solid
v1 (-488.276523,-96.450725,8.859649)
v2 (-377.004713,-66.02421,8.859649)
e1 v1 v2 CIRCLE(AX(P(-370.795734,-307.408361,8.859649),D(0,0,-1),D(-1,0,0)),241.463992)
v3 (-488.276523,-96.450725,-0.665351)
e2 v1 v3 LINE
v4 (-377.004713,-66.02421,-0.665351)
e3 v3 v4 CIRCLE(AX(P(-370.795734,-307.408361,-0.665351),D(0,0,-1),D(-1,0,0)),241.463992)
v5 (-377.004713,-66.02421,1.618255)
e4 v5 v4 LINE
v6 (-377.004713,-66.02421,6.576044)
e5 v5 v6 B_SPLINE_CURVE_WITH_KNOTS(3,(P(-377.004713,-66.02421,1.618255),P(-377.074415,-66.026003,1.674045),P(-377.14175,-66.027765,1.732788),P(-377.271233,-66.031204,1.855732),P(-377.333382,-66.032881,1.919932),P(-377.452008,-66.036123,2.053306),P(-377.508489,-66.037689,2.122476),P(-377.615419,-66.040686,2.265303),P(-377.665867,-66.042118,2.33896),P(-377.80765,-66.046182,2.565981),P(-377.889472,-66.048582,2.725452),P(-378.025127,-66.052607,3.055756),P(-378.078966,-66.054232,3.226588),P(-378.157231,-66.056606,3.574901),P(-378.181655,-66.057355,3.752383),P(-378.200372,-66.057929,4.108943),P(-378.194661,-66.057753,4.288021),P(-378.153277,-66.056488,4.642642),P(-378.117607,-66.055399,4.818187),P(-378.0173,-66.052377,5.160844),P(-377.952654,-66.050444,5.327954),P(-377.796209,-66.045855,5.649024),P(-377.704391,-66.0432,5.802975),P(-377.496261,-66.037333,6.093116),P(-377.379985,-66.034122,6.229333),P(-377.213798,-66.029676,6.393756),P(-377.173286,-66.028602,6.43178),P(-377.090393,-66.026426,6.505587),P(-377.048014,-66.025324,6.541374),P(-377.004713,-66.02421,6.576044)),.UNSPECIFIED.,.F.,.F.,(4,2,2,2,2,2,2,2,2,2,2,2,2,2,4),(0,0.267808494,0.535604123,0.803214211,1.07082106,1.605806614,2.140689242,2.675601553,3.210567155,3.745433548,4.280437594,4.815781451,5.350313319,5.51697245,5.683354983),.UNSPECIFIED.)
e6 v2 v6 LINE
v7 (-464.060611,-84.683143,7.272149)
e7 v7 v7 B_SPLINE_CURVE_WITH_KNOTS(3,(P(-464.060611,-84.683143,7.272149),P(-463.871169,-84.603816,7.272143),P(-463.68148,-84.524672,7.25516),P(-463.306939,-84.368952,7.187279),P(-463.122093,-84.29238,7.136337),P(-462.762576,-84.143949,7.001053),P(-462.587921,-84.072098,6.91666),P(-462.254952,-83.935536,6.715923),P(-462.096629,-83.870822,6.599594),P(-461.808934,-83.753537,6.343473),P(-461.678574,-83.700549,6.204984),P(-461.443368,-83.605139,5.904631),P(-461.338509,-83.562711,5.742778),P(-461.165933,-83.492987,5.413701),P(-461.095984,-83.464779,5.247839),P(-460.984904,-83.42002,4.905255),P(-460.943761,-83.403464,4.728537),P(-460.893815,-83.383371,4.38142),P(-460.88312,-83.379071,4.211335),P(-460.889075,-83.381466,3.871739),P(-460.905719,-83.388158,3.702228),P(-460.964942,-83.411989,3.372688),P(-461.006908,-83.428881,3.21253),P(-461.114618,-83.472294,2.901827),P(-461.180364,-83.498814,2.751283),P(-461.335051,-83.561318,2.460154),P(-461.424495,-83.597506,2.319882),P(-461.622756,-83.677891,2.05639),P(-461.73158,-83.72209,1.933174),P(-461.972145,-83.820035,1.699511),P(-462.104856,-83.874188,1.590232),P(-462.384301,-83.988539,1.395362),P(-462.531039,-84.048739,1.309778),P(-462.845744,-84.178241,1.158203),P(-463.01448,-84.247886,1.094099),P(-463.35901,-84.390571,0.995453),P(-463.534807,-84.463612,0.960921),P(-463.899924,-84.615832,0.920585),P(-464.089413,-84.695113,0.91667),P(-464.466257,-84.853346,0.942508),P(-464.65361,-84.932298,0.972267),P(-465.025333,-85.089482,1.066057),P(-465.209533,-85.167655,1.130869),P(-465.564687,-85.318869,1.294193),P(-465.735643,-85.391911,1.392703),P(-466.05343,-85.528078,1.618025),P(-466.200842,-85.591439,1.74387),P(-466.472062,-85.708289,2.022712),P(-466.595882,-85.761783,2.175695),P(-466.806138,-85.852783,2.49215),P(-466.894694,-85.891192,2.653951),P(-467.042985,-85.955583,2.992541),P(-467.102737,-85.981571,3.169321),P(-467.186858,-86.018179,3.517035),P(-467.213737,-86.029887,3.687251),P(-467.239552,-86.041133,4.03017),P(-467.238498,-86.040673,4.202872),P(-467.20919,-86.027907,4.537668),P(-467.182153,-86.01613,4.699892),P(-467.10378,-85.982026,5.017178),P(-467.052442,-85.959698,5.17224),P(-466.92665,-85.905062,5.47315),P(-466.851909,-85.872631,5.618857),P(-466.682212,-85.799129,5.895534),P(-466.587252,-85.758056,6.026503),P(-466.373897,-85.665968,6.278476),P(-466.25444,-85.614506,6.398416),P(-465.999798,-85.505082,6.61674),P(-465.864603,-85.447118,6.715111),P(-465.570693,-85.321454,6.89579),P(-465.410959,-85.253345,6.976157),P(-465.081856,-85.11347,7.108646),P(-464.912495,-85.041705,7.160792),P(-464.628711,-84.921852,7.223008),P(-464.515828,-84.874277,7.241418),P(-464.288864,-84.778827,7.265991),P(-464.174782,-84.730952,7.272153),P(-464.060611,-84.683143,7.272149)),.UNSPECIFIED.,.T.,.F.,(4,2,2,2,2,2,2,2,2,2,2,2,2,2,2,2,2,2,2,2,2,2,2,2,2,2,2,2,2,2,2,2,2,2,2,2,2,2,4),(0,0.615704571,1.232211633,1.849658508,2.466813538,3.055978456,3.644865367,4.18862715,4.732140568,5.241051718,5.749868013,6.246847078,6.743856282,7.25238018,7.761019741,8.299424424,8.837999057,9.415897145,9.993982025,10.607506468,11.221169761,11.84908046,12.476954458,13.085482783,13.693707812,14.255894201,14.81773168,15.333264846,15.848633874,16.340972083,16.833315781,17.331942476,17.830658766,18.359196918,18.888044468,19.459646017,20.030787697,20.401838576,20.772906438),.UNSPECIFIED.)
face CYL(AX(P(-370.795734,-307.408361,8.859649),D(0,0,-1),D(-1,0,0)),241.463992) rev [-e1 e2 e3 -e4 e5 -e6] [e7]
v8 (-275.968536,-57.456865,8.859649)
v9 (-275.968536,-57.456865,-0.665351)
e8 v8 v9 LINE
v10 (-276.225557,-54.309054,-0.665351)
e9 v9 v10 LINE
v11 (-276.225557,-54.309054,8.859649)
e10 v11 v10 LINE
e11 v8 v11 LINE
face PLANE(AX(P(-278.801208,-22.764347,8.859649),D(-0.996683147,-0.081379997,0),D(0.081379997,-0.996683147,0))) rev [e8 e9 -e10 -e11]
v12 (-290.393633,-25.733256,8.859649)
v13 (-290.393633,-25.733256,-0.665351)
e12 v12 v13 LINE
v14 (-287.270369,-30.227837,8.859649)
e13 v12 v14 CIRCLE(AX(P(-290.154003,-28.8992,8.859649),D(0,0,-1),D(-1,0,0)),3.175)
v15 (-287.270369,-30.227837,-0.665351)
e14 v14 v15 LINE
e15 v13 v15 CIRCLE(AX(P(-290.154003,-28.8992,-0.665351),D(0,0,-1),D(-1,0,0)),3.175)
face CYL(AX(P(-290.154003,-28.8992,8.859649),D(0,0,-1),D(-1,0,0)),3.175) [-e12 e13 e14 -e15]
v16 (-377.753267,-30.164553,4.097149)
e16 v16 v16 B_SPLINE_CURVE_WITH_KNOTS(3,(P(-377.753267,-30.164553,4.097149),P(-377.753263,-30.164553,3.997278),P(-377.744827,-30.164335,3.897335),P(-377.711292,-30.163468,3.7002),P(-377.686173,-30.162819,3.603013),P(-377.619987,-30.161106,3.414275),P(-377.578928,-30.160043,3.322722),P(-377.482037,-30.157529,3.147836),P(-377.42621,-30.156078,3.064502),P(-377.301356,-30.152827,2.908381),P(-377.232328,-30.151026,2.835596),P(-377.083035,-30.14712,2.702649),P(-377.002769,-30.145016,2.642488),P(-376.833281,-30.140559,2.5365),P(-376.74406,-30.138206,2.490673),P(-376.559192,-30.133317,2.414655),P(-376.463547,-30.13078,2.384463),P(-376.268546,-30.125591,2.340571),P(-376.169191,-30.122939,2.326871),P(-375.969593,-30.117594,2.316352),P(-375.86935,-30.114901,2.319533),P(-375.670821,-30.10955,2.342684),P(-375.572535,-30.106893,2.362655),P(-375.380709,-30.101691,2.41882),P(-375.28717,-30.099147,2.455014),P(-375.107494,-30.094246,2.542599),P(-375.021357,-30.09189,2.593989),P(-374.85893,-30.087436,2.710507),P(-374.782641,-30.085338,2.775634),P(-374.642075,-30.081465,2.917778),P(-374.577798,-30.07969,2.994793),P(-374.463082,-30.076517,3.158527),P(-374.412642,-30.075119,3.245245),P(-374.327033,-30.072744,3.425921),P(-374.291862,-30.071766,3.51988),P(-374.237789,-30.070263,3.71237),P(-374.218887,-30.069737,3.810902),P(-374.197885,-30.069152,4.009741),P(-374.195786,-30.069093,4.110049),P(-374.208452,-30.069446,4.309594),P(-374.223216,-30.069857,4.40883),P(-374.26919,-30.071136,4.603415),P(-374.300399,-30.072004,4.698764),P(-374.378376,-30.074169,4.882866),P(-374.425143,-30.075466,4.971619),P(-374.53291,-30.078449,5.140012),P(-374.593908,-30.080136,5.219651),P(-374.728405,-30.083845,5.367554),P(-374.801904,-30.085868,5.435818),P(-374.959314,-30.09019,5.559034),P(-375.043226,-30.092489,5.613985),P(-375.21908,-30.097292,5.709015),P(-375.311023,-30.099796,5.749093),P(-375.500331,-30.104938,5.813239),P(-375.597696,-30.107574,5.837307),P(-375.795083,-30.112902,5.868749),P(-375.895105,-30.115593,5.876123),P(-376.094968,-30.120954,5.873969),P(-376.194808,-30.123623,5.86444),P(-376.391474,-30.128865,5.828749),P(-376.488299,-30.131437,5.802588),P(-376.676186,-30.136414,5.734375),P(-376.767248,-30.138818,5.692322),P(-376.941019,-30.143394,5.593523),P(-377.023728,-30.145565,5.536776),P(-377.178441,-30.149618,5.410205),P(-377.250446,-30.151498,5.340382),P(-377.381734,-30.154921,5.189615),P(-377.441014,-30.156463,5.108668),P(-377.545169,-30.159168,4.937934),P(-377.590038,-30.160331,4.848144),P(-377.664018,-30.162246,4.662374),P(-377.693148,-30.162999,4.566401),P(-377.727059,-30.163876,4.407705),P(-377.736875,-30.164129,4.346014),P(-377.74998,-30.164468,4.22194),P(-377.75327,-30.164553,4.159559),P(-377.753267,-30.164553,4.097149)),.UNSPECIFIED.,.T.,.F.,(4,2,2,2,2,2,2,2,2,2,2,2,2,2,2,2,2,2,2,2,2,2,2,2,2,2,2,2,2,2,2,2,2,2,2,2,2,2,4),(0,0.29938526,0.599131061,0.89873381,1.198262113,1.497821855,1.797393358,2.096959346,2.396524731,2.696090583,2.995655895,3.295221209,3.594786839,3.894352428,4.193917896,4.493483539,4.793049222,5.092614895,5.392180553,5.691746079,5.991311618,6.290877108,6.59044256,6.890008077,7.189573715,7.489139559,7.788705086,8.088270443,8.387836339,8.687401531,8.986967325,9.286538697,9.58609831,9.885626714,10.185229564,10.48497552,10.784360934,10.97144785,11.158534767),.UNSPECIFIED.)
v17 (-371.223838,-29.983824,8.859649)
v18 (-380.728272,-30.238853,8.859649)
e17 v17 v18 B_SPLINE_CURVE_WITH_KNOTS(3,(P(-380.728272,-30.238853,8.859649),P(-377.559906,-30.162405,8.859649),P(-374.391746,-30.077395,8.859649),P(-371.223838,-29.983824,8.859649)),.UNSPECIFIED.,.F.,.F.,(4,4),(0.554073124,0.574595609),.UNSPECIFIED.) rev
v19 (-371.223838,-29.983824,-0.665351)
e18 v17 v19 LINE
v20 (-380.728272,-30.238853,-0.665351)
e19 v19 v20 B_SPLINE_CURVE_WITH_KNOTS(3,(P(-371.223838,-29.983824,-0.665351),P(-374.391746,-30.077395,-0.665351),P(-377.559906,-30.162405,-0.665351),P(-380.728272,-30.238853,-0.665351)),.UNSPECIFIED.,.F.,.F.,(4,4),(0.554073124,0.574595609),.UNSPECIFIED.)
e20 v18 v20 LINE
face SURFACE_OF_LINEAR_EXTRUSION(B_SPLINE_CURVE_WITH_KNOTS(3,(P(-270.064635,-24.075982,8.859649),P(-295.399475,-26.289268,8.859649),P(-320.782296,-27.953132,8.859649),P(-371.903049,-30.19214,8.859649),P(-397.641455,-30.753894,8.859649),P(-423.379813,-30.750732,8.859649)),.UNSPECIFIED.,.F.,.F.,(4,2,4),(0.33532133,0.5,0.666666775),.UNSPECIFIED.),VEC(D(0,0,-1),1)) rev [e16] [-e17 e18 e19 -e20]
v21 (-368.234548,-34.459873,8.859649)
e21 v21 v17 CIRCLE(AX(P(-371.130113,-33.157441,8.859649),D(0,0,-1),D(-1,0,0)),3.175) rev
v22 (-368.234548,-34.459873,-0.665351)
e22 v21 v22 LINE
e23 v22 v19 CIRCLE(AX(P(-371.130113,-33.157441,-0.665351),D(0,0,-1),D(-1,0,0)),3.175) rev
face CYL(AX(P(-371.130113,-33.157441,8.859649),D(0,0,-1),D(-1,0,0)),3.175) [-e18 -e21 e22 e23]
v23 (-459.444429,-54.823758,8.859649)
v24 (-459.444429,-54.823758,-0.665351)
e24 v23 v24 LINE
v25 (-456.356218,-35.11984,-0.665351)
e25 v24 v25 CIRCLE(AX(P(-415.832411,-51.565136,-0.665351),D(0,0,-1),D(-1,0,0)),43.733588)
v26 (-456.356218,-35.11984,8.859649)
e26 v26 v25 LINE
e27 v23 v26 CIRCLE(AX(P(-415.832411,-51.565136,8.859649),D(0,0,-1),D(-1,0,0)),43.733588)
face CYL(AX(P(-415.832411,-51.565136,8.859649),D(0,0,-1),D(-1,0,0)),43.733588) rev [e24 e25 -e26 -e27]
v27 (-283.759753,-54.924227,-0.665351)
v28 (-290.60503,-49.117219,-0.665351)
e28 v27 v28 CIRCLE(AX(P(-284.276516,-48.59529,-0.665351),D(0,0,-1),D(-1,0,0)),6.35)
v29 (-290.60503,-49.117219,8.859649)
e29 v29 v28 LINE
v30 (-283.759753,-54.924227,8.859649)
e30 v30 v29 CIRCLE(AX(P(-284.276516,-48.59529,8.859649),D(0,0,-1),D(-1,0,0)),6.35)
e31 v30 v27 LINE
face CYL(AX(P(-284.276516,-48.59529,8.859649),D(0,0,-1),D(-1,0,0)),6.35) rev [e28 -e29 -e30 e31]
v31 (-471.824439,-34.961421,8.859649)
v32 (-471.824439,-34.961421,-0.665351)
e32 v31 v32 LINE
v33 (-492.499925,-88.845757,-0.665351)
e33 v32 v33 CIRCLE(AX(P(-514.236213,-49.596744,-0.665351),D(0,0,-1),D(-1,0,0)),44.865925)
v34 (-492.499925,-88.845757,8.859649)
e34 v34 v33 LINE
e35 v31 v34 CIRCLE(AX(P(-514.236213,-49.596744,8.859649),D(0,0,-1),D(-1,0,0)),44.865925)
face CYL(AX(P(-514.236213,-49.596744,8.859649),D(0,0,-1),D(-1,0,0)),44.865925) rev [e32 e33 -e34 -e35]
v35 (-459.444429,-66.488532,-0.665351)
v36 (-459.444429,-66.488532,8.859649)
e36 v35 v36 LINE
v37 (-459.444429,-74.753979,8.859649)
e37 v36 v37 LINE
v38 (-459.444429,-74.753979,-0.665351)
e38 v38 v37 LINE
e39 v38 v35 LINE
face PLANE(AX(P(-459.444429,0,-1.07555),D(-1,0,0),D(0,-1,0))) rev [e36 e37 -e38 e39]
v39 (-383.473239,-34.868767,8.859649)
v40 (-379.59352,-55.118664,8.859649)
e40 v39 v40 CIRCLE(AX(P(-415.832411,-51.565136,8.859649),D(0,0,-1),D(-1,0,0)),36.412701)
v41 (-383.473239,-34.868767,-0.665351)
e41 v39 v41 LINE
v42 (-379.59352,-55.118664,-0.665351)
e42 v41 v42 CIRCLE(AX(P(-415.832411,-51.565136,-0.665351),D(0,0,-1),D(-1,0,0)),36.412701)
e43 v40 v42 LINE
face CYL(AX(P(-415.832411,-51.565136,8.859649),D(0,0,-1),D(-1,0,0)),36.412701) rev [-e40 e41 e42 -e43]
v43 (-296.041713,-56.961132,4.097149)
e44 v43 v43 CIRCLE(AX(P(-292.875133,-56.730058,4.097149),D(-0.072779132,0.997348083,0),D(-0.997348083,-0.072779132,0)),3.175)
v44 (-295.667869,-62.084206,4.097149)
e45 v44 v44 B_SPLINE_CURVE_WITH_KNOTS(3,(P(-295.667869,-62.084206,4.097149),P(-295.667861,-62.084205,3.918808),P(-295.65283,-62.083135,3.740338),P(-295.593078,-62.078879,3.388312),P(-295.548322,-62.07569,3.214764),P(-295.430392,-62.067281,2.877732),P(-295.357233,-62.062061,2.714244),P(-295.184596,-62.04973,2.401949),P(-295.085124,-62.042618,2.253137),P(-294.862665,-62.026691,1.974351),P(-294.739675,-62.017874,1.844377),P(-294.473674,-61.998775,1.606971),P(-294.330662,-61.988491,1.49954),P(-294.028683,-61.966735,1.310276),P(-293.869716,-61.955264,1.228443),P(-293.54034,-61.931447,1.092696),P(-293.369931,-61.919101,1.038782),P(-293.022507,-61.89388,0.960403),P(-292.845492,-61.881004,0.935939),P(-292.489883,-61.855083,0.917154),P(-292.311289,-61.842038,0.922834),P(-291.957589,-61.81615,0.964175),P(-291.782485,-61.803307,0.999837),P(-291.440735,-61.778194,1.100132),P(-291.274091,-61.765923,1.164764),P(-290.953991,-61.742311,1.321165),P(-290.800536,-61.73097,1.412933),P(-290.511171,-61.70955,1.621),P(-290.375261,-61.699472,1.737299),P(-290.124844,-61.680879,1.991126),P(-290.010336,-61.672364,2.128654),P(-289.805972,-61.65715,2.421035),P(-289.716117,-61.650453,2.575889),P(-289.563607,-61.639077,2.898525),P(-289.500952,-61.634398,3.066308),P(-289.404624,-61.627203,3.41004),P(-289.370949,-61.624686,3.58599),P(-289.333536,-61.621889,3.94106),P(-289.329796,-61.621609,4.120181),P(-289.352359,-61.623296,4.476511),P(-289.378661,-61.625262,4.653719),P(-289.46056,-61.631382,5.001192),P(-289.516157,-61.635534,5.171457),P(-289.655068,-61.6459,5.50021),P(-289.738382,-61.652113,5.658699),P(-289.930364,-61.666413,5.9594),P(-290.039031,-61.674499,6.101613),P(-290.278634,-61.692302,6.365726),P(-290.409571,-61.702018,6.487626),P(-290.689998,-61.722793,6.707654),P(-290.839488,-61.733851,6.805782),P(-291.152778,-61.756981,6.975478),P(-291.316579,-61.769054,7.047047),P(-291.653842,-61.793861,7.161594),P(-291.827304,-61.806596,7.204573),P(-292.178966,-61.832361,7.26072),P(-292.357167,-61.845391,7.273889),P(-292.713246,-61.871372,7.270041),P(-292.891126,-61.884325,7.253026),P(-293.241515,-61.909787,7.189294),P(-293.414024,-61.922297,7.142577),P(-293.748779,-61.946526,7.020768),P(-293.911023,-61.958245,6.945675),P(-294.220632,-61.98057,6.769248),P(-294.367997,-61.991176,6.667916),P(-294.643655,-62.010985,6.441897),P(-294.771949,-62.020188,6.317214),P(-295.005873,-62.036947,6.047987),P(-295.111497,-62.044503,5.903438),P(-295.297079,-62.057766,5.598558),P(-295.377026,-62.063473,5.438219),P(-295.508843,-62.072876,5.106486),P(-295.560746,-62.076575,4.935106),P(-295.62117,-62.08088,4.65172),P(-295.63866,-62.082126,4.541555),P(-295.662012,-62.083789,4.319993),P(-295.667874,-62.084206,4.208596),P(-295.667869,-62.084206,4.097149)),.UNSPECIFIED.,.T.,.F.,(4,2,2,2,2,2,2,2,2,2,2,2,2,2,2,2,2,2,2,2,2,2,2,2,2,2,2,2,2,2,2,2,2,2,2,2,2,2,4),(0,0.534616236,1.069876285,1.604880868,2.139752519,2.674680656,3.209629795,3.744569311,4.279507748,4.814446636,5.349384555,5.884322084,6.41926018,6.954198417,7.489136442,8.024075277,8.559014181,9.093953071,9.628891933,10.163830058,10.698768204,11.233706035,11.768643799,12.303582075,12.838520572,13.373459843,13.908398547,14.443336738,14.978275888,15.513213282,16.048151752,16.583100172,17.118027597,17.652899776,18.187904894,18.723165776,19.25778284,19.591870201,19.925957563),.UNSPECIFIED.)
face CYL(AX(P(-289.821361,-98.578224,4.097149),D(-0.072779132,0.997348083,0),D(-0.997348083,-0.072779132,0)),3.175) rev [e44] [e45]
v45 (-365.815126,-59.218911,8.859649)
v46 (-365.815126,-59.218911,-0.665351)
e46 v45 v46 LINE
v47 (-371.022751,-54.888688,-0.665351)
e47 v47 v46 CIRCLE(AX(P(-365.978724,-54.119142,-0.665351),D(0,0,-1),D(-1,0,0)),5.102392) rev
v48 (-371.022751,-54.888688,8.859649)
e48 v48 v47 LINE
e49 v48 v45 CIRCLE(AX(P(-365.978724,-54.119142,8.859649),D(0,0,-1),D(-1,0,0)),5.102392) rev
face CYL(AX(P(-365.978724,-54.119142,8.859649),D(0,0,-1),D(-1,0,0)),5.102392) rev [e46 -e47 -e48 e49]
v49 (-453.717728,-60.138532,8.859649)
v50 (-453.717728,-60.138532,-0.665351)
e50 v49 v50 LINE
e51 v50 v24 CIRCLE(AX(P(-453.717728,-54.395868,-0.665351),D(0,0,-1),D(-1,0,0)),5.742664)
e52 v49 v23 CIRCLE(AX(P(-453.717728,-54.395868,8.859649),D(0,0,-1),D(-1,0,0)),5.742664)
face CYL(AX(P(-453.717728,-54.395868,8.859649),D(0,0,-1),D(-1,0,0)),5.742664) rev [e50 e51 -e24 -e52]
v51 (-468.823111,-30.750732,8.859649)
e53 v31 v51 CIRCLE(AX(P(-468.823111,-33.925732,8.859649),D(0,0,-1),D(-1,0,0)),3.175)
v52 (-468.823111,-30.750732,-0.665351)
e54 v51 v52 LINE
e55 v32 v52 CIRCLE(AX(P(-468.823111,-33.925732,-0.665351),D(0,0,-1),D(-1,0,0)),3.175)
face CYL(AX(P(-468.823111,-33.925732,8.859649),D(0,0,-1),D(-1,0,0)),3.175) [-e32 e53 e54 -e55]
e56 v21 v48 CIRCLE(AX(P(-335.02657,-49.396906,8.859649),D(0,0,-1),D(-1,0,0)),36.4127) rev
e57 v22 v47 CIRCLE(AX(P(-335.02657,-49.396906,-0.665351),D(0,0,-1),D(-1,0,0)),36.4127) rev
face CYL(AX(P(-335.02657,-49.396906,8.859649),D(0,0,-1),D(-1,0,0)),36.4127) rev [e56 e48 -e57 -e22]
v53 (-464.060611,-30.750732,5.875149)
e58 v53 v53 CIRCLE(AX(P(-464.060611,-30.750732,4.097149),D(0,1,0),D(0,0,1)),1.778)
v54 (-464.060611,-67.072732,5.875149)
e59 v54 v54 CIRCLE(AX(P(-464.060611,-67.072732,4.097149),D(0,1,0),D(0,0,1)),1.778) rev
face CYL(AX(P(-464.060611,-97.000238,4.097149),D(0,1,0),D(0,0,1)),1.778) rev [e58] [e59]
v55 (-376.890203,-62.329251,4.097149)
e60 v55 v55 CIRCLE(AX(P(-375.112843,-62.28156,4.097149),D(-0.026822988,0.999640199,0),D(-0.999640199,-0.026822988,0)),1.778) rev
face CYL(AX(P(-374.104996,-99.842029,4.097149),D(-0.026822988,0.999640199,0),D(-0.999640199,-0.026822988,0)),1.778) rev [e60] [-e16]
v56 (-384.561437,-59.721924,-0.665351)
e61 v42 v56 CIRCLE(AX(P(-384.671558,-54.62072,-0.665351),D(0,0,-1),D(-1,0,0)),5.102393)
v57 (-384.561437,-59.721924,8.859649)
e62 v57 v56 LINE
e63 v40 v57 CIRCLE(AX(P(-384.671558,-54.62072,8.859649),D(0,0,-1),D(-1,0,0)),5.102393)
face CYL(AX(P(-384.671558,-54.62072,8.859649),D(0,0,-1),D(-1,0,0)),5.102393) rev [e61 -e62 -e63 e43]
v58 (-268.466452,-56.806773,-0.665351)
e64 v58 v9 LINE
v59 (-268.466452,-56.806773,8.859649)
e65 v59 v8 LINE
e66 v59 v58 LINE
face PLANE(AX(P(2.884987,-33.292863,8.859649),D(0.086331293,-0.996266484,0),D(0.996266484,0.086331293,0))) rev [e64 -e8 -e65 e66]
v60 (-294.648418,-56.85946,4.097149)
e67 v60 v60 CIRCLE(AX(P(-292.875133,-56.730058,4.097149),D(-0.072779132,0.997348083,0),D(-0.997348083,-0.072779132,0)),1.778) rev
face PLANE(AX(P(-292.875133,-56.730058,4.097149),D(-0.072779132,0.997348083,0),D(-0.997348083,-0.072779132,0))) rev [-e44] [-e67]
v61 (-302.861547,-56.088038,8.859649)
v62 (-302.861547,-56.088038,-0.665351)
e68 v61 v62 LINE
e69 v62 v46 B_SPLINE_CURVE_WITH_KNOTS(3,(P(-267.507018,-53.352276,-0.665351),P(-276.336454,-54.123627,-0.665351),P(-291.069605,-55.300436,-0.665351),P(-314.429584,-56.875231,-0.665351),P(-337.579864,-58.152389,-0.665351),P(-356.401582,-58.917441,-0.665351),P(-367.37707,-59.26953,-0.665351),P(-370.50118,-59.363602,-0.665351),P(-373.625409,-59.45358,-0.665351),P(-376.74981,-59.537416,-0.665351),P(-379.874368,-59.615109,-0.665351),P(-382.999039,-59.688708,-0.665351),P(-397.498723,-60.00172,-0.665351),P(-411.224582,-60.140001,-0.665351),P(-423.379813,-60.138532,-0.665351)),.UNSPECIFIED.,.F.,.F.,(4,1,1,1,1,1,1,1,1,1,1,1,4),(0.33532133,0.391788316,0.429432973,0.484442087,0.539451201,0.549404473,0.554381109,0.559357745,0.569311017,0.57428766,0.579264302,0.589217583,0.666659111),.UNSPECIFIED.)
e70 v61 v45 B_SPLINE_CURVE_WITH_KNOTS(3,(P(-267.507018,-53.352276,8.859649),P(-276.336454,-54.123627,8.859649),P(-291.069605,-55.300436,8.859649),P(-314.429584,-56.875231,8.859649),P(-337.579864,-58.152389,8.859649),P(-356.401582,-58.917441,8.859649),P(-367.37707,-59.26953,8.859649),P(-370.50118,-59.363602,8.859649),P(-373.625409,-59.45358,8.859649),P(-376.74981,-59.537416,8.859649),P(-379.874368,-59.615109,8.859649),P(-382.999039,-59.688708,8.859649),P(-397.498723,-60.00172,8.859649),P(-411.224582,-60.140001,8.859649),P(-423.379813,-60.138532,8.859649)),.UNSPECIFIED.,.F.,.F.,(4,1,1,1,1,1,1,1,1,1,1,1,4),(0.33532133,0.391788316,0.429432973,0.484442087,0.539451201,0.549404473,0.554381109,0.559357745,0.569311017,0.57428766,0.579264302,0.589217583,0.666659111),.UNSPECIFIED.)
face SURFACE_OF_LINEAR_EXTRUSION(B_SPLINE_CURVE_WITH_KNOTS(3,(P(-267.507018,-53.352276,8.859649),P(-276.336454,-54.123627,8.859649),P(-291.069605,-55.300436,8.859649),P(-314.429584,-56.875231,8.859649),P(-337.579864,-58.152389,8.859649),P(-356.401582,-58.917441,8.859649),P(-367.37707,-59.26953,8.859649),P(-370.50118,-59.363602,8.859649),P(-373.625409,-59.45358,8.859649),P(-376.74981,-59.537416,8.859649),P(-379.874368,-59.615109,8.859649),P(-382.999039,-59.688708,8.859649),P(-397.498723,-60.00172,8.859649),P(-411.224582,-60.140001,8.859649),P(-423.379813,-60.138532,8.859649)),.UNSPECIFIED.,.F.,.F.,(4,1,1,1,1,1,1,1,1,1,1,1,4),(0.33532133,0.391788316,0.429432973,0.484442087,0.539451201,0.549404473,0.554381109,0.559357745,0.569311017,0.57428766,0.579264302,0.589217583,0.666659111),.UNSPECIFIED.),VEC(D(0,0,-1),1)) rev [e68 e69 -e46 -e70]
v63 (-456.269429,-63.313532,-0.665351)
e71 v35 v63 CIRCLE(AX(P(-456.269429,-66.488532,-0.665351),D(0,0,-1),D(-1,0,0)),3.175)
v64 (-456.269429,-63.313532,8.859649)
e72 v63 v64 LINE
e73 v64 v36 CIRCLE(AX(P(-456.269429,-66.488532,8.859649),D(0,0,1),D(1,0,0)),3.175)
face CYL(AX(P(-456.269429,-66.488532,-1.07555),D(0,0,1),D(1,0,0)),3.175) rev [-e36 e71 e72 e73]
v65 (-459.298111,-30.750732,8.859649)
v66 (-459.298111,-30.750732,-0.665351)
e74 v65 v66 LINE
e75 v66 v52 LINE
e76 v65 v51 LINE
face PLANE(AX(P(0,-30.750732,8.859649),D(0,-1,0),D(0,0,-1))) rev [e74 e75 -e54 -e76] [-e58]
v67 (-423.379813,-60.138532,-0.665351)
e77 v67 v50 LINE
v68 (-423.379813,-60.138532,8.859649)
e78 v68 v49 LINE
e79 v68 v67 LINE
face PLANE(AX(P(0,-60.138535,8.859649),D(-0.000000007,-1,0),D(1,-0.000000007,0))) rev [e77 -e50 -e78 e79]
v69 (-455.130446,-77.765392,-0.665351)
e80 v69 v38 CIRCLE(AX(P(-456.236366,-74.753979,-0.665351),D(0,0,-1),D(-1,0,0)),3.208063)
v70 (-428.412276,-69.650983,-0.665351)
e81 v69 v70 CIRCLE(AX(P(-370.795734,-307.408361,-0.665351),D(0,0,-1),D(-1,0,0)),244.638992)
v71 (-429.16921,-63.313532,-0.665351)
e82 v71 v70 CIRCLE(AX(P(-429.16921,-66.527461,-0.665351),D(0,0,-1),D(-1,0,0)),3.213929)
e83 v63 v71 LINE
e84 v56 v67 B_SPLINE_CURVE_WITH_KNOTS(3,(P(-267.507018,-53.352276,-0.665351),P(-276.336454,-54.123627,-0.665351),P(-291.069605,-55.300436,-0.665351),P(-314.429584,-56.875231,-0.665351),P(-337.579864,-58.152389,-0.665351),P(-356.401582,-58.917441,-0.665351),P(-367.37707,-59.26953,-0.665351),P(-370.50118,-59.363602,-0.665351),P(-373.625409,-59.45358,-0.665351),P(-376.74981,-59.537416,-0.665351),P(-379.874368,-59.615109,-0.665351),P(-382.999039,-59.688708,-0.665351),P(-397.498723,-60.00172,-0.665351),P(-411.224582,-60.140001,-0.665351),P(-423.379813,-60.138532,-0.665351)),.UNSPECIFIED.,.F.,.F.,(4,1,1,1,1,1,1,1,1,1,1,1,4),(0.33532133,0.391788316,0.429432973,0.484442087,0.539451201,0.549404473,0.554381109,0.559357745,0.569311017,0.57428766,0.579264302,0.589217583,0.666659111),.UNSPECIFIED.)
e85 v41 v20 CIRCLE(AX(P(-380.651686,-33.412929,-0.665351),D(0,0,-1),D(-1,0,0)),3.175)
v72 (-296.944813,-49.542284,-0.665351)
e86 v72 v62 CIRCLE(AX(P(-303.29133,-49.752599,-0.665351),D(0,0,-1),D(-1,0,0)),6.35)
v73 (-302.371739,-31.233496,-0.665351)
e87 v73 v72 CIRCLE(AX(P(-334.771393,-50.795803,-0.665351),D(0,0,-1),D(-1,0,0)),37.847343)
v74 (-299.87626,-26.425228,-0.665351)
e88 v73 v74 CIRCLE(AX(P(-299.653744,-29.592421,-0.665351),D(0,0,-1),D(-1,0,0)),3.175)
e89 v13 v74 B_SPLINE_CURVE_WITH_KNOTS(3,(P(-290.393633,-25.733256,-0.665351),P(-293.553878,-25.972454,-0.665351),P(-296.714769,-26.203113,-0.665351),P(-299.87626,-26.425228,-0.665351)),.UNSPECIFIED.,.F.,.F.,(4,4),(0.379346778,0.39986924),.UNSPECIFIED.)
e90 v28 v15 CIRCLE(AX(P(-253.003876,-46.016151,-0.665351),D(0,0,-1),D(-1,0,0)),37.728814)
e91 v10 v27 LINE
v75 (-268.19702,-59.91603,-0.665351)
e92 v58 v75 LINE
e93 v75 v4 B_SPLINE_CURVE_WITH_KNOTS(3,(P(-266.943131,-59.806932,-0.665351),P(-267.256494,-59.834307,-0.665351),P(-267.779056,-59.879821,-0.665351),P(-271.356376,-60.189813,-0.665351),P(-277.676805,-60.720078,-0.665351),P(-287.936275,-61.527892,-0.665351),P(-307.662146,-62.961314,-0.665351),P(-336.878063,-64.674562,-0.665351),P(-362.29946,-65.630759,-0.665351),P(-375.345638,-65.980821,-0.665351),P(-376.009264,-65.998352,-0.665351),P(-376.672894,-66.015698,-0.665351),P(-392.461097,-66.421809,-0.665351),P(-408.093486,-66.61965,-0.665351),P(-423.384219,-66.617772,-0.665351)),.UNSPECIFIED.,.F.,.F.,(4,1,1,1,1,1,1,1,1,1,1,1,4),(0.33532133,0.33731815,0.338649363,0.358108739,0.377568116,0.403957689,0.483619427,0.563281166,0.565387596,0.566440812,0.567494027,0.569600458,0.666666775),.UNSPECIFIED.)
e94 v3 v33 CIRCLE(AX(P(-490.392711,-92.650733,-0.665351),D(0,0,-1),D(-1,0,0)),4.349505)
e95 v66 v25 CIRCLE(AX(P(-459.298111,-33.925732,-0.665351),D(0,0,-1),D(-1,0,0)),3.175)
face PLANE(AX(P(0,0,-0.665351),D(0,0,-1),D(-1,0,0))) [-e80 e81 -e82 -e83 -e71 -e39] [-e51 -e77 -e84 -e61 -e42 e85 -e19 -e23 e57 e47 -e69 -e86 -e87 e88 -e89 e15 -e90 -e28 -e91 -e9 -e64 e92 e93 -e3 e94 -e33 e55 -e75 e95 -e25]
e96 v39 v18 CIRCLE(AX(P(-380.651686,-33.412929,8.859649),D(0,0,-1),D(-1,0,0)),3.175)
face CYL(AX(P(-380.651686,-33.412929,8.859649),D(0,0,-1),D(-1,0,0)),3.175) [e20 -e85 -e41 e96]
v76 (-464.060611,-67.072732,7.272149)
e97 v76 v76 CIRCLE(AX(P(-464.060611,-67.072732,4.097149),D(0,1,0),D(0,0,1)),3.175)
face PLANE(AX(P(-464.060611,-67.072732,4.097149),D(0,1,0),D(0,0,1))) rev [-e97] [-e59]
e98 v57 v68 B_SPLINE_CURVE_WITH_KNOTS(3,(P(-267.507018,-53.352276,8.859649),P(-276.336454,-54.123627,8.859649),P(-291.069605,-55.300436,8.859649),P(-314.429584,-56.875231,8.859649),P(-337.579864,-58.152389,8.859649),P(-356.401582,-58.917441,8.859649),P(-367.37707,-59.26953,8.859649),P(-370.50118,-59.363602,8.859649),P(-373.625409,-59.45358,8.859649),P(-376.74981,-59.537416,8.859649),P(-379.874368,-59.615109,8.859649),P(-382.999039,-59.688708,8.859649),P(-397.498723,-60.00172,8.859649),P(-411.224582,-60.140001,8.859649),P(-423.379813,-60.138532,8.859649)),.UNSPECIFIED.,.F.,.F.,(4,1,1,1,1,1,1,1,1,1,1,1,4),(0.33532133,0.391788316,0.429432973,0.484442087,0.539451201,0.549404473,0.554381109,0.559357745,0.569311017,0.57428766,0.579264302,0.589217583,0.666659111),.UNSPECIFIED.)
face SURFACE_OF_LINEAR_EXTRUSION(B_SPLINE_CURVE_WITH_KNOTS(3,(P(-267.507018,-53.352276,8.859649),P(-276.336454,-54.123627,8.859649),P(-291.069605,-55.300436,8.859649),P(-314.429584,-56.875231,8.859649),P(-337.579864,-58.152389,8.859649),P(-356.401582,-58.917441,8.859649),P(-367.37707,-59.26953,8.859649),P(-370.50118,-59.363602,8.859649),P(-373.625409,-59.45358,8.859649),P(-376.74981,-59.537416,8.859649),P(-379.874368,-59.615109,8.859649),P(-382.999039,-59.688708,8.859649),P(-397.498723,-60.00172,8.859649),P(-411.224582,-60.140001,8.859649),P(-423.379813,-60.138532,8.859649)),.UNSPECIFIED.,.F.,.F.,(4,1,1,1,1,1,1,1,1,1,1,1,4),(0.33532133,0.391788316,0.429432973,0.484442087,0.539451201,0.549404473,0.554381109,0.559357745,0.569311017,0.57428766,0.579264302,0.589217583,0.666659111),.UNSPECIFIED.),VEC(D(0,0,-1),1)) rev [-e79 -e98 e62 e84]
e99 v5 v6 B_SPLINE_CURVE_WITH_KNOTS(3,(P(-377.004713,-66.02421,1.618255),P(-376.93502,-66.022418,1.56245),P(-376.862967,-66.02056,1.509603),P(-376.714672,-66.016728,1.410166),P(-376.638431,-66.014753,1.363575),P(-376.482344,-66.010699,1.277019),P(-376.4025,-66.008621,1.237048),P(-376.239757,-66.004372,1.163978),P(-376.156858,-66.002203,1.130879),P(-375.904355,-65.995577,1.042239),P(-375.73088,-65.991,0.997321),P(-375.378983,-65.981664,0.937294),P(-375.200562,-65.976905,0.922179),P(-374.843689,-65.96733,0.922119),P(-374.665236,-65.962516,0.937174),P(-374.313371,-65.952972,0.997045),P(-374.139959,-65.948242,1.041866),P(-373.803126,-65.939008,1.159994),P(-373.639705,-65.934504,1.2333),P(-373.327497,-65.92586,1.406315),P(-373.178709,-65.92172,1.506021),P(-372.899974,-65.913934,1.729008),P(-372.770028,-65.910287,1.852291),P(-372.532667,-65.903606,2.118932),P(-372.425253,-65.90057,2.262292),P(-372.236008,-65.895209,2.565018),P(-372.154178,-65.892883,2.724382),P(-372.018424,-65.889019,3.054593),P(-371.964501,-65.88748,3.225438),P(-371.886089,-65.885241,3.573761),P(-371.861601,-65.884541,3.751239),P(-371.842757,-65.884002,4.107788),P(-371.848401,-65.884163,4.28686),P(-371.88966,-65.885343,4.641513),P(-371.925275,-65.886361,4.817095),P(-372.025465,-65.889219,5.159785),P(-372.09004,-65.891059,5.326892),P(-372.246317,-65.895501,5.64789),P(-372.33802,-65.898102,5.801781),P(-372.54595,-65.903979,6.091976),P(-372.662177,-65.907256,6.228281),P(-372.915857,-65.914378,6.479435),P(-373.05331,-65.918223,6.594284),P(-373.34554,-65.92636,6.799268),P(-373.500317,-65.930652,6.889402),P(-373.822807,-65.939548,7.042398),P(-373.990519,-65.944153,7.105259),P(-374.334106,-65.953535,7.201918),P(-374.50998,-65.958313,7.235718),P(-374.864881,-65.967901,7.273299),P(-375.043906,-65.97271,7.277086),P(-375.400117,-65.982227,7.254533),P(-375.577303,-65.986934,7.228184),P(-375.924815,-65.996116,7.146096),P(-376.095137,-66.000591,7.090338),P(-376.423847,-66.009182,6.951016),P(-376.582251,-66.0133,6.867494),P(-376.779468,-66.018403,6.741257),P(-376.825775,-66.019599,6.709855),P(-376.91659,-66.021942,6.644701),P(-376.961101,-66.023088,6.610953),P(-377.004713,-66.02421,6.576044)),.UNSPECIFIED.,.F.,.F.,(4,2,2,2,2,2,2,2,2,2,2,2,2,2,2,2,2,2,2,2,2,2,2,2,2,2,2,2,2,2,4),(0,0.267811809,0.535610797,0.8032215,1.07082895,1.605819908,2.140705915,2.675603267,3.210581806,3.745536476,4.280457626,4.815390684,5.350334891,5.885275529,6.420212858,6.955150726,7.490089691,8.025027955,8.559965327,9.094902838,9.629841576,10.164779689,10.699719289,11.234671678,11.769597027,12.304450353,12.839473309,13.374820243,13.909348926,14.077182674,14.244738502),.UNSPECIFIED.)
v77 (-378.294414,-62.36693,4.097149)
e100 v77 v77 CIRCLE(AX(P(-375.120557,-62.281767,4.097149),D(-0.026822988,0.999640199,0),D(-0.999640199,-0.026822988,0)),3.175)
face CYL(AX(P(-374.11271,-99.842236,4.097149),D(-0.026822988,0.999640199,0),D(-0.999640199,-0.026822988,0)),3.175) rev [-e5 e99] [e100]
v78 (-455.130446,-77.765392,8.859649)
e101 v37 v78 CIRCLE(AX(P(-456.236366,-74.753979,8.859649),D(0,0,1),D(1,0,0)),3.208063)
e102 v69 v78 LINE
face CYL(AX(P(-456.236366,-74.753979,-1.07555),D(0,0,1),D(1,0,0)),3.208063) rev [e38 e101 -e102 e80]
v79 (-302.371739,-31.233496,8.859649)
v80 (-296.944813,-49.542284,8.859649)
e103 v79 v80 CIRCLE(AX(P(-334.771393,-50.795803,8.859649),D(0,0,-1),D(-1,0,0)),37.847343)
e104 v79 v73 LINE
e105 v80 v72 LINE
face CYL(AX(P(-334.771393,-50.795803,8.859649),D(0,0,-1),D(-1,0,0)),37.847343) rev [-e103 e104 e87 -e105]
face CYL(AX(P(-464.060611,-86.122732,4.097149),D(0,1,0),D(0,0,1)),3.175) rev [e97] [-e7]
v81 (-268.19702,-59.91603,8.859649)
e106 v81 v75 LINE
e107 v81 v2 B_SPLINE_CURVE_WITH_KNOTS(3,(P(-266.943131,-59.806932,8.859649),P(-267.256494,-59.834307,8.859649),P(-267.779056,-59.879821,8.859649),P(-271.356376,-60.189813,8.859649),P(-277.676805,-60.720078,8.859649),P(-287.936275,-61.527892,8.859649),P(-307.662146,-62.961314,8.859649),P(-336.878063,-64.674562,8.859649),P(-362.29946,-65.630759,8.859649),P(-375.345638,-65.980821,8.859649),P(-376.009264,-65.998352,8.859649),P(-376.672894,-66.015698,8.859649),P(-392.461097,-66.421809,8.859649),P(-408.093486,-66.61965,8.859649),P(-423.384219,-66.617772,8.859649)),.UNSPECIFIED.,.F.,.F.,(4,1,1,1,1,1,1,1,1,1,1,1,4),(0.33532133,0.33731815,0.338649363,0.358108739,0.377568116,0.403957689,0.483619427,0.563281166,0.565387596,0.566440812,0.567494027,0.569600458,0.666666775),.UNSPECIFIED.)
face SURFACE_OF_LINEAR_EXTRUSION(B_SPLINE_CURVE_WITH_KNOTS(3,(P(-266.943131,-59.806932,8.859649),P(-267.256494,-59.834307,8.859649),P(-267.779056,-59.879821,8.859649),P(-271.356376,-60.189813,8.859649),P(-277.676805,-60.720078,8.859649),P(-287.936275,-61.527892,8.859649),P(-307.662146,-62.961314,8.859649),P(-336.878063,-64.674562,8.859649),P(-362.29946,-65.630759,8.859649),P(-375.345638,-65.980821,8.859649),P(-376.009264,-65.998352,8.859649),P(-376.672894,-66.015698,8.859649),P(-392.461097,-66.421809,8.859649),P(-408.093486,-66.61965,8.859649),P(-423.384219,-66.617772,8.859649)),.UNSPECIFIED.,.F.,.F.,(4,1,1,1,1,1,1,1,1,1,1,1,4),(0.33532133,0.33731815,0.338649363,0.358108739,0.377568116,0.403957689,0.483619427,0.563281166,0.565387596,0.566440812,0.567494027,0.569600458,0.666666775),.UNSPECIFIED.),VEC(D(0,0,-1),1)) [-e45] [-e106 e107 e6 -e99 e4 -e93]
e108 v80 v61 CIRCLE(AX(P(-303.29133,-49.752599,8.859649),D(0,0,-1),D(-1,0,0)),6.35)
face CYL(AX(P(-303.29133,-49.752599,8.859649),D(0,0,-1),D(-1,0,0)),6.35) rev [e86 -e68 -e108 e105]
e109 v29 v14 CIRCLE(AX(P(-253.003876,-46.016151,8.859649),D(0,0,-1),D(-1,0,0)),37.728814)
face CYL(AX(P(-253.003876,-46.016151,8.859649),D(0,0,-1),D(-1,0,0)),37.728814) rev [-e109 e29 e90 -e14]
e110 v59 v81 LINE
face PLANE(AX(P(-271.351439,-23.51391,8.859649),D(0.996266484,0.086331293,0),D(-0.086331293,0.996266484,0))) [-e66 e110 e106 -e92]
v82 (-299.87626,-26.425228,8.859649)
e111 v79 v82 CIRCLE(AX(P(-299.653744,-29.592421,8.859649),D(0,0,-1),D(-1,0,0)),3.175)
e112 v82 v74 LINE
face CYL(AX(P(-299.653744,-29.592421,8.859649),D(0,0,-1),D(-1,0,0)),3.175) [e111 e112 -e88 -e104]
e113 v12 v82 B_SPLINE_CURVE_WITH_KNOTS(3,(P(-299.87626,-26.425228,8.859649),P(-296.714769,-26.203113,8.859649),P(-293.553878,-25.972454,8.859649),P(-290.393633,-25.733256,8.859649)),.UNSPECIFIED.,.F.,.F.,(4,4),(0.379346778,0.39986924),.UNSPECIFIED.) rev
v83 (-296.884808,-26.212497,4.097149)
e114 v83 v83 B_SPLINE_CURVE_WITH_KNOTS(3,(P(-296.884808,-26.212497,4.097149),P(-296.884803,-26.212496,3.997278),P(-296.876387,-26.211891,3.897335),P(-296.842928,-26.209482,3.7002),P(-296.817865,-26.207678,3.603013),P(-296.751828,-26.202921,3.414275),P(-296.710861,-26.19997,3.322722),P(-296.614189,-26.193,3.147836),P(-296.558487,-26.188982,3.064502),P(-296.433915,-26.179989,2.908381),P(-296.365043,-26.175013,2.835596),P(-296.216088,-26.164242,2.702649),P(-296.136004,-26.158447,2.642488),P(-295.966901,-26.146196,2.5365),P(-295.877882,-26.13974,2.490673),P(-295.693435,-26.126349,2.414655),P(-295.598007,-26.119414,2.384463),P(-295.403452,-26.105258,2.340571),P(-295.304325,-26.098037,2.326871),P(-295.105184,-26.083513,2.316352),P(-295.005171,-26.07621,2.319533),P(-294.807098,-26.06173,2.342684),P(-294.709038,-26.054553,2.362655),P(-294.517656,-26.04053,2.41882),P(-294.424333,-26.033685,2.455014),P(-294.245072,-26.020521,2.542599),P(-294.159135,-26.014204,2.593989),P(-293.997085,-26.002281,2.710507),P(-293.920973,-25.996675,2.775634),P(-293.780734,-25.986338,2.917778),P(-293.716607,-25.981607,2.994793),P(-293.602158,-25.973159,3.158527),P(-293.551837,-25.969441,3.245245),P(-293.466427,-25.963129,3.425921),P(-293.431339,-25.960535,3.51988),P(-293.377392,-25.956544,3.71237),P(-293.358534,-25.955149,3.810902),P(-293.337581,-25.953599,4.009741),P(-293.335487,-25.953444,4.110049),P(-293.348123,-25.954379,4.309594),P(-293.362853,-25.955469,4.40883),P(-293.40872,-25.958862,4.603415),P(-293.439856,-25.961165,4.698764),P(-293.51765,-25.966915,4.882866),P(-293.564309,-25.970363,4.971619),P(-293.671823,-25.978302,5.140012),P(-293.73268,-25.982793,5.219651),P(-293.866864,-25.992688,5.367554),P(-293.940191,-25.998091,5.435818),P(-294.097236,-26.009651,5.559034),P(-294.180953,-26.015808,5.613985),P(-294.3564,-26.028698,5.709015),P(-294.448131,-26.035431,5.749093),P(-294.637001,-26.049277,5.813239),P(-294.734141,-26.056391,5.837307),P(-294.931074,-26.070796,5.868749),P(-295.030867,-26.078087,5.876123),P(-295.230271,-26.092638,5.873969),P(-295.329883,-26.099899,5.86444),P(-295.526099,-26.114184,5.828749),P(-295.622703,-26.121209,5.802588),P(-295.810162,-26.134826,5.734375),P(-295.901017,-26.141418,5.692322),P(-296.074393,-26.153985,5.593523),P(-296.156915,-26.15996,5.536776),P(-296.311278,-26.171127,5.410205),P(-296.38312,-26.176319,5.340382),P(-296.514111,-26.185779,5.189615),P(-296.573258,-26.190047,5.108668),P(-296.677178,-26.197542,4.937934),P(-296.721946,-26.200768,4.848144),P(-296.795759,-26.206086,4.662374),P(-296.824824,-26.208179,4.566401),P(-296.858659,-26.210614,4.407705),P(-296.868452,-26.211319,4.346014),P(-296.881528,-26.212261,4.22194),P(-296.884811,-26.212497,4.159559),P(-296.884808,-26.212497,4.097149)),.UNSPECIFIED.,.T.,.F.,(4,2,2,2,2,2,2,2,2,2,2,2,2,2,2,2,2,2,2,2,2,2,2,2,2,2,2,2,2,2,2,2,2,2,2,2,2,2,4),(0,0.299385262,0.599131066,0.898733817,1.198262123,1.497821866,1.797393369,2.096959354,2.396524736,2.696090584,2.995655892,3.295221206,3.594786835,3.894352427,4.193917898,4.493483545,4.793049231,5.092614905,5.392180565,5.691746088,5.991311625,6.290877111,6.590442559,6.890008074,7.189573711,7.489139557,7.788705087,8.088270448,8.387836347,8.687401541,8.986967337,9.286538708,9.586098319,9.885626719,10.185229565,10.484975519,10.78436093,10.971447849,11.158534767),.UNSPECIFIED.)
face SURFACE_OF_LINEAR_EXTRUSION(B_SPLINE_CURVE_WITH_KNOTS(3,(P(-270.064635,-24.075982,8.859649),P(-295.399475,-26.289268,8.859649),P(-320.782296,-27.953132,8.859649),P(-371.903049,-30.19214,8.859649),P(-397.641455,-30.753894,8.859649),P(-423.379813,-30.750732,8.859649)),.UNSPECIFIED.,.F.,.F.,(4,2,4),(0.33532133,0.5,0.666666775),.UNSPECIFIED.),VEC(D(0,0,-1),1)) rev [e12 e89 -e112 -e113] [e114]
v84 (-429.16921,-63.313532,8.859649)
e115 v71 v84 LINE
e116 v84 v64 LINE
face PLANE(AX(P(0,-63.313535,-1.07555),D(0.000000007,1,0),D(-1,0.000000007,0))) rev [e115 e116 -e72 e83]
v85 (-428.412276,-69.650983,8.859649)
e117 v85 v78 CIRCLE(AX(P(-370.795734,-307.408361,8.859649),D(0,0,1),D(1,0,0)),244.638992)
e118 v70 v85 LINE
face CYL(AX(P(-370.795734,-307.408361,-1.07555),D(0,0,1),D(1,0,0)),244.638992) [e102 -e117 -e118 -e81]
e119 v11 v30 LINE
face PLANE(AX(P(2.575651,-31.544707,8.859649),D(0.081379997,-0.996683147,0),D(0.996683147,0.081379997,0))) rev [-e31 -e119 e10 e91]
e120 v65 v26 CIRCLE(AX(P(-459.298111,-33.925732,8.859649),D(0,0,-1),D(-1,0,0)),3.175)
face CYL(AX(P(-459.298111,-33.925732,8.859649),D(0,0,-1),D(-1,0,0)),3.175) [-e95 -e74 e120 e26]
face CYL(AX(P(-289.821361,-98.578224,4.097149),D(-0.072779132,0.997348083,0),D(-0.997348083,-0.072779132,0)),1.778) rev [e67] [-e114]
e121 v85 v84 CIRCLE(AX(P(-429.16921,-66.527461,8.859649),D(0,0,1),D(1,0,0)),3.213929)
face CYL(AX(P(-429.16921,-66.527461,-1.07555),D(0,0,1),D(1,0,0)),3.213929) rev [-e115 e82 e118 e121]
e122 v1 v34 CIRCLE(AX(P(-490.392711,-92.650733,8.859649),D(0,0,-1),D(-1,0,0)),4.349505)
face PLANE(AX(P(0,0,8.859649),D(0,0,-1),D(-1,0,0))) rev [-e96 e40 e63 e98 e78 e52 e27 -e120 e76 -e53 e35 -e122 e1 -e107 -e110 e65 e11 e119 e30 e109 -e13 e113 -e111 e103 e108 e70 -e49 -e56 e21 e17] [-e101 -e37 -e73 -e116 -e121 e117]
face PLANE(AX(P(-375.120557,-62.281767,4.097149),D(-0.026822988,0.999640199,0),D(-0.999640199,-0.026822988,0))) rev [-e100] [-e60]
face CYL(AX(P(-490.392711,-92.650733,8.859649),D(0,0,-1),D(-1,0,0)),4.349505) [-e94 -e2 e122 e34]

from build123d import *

# Parameters (mm, degrees)
BOSS_EXTRUDE5_START      = -4.7625
BOSS_EXTRUDE5_DEPTH      = 9.525
SKETCH6_R                = 1.778
CUT_EXTRUDE3_DEPTH       = 504.713812734
SKETCH10_R               = 1.778
CUT_EXTRUDE6_DEPTH       = 502.305899638
CUT_EXTRUDE11_DEPTH      = 3.556
CUT_EXTRUDE11_DEPTH_BACK = 499.029405252
SKETCH12_R               = 3.175
SKETCH13_R               = 1.778
CUT_EXTRUDE12_DEPTH      = 500.236768439
SKETCH14_R               = 3.175
CUT_EXTRUDE13_DEPTH      = 19.05
CUT_EXTRUDE14_DEPTH      = 3.556
CUT_EXTRUDE14_DEPTH_BACK = 502.047726259
SKETCH16_R               = 3.175
CUT_EXTRUDE15_START      = -9.525
CUT_EXTRUDE15_DEPTH      = 9.525


# Read off the part's stored shape, not the designer's step: Boss-Extrude5, Cut-Extrude15
with BuildPart() as part:
    # Boss-Extrude5 outline → Boss-Extrude5 (new body)
    with BuildSketch(Plane(origin=(0, 0, 4.097149242), x_dir=(-1, 0, 0), z_dir=(0, 0, -1)).offset(BOSS_EXTRUDE5_START)):
        with BuildLine():
            Line((275.968535621, -57.45686485), (268.466452075, -56.806773151))
            Line((268.466452075, -56.806773151), (268.19701998, -59.916030026))
            add(Edge.make_bspline(
                [(268.19701998, -59.916030026), (268.301513894, -59.925084927), (271.460895726, -60.19858153), (277.676804899, -60.720078346), (287.936274788, -61.527892452), (307.662146031, -62.961314107), (336.878063452, -64.674562273), (362.299459592, -65.630758689), (375.34563844, -65.980821156), (376.009263562, -65.998351659), (376.506986395, -66.011361482), (376.838803336, -66.019942665), (377.004712591, -66.024210248)],
                knots=[0.337983756, 0.337983756, 0.337983756, 0.337983756, 0.338649363, 0.358108739, 0.377568116, 0.403957689, 0.483619427, 0.563281166, 0.565387596, 0.566440812, 0.567494027, 0.568547243, 0.568547243, 0.568547243, 0.568547243], degree=3))
            ThreePointArc((377.004712591, -66.024210248), (434.484295389, -74.49501479), (488.276522854, -96.450725494))
            ThreePointArc((488.276522854, -96.450725494), (494.19519795, -94.762435803), (492.499924864, -88.845757162))
            ThreePointArc((492.499924864, -88.845757162), (472.347982204, -65.669309605), (471.824439099, -34.961421092))
            ThreePointArc((471.824439099, -34.961421092), (471.408544547, -32.082865726), (468.823110549, -30.750731982))
            Line((468.823110549, -30.750731982), (459.298110549, -30.750731982))
            ThreePointArc((459.298110549, -30.750731982), (456.664489609, -32.15241144), (456.356218194, -35.119840174))
            ThreePointArc((456.356218194, -35.119840174), (459.038549003, -44.793404021), (459.444428928, -54.823757832))
            ThreePointArc((459.444428928, -54.823757832), (457.624194748, -58.605108853), (453.717728119, -60.138531982))
            Line((453.717728119, -60.138531982), (423.379813153, -60.138532201))
            add(Edge.make_bspline(
                [(384.561436501, -59.721923859), (385.342635212, -59.738787815), (398.280332925, -60.009594345), (411.224581778, -60.140000907), (423.379813153, -60.138532201)],
                knots=[0.584240942, 0.584240942, 0.584240942, 0.584240942, 0.589217583, 0.666659111, 0.666659111, 0.666659111, 0.666659111], degree=3))
            ThreePointArc((384.561436501, -59.721923859), (381.203597368, -58.363400914), (379.593520206, -55.118663672))
            ThreePointArc((379.593520206, -55.118663672), (380.07016651, -44.713375232), (383.473239108, -34.868766752))
            ThreePointArc((383.473239108, -34.868766752), (383.382771388, -31.793732831), (380.728271975, -30.238853129))
            add(Edge.make_bspline(
                [(371.223837985, -29.983824335), (374.39174563, -30.077394979), (377.559905672, -30.162404856), (380.728271975, -30.238853129)],
                knots=[0.554073124, 0.554073124, 0.554073124, 0.554073124, 0.574595609, 0.574595609, 0.574595609, 0.574595609], degree=3))
            ThreePointArc((371.223837985, -29.983824335), (368.489785186, -31.39412107), (368.234547952, -34.459873245))
            ThreePointArc((368.234547952, -34.459873245), (371.104790651, -44.472811018), (371.022751, -54.88868758))
            ThreePointArc((371.022751, -54.88868758), (369.240986237, -58.042412825), (365.815125645, -59.218910906))
            add(Edge.make_bspline(
                [(302.861547137, -56.088038468), (305.811031553, -56.28688123), (317.379618611, -57.037979008), (337.579863558, -58.152389447), (355.620822681, -58.885705677), (365.034145822, -59.193857367), (365.815125645, -59.218910906)],
                knots=[0.410604965, 0.410604965, 0.410604965, 0.410604965, 0.429432973, 0.484442087, 0.539451201, 0.544427837, 0.544427837, 0.544427837, 0.544427837], degree=3))
            ThreePointArc((302.861547137, -56.088038468), (298.580567699, -54.010676189), (296.944813444, -49.54228442))
            ThreePointArc((296.944813444, -49.54228442), (298.48456489, -40.039989376), (302.371739219, -31.23349624))
            ThreePointArc((302.371739219, -31.23349624), (302.471812822, -28.129850677), (299.876260243, -26.425228339))
            add(Edge.make_bspline(
                [(290.39363306, -25.733255912), (293.55387775, -25.972454095), (296.714768824, -26.203112639), (299.876260243, -26.425228339)],
                knots=[0.379346778, 0.379346778, 0.379346778, 0.379346778, 0.39986924, 0.39986924, 0.39986924, 0.39986924], degree=3))
            ThreePointArc((290.39363306, -25.733255912), (287.546704938, -27.087400093), (287.270368838, -30.227837094))
            ThreePointArc((287.270368838, -30.227837094), (290.158173856, -39.457070008), (290.605029929, -49.117218954))
            ThreePointArc((290.605029929, -49.117218954), (288.384368096, -53.437608207), (283.759752935, -54.924227487))
            Line((283.759752935, -54.924227487), (276.225556942, -54.309054203))
            Line((276.225556942, -54.309054203), (275.968535621, -57.45686485))
        make_face()
    extrude(amount=BOSS_EXTRUDE5_DEPTH)

    # Sketch6 → Cut-Extrude3 (cut, through all)
    with BuildSketch(Plane(origin=(0.329719812, -4.518402653, 0), x_dir=(0.9973480826532571, 0.07277913181587167, 0), z_dir=(-0.07277913181587167, 0.9973480826532571, 0))):
        with Locations(Location((-296.227216633, -4.097149242, 0), (0, 0, 180))):
            Circle(SKETCH6_R)
    extrude(amount=-CUT_EXTRUDE3_DEPTH, mode=Mode.SUBTRACT)

    # Sketch10 → Cut-Extrude6 (cut, through all)
    with BuildSketch(Plane(origin=(0.536880971, -20.008501524, 0), x_dir=(0.9996401989225796, 0.02682298823818541, 0), z_dir=(-0.02682298823818541, 0.9996401989225796, 0))):
        with Locations(Location((-376.648454476, -4.097149242, 0), (0, 0, 180))):
            Circle(SKETCH10_R)
    extrude(amount=-CUT_EXTRUDE6_DEPTH, mode=Mode.SUBTRACT)

    # Sketch12 → Cut-Extrude11 (cut, two sides: drawn at the far end of the back side and taken through both)
    with BuildSketch(Plane(origin=(1.49547556, -55.733443025, 0), x_dir=(0.9996401989225796, 0.02682298823818541, 0), z_dir=(-0.02682298823818541, 0.9996401989225796, 0)).offset(-CUT_EXTRUDE11_DEPTH_BACK)):
        with Locations(Location((-376.656171029, -4.097149242, 0), (0, 0, 180))):
            Circle(SKETCH12_R)
    extrude(amount=CUT_EXTRUDE11_DEPTH + CUT_EXTRUDE11_DEPTH_BACK, mode=Mode.SUBTRACT)

    # Sketch13 → Cut-Extrude12 (cut, through all)
    with BuildSketch(Plane(origin=(0, -30.750731982, 0), x_dir=(1, 0, 0), z_dir=(0, 1, 0))):
        with Locations(Location((-464.060610549, -4.097149242, 0), (0, 0, 270))):
            Circle(SKETCH13_R)
    extrude(amount=-CUT_EXTRUDE12_DEPTH, mode=Mode.SUBTRACT)

    # Sketch14 → Cut-Extrude13 (cut)
    with BuildSketch(Plane(origin=(0, -67.072731982, 0), x_dir=(1, 0, 0), z_dir=(0, 1, 0))):
        with Locations(Location((-464.060610549, -4.097149242, 0), (0, 0, 270))):
            Circle(SKETCH14_R)
    extrude(amount=-CUT_EXTRUDE13_DEPTH, mode=Mode.SUBTRACT)

    # Sketch16 → Cut-Extrude14 (cut, two sides: drawn at the far end of the back side and taken through both)
    with BuildSketch(Plane(origin=(2.825316242, -38.717468408, 0), x_dir=(0.9973480826532571, 0.07277913181587167, 0), z_dir=(-0.07277913181587167, 0.9973480826532571, 0)).offset(-CUT_EXTRUDE14_DEPTH_BACK)):
        with Locations(Location((-296.227216633, -4.097149242, 0), (0, 0, 180))):
            Circle(SKETCH16_R)
    extrude(amount=CUT_EXTRUDE14_DEPTH + CUT_EXTRUDE14_DEPTH_BACK, mode=Mode.SUBTRACT)

    # Cut-Extrude15 outline → Cut-Extrude15 (cut)
    with BuildSketch(Plane.XY.offset(8.859649242).offset(CUT_EXTRUDE15_START)):
        with BuildLine():
            ThreePointArc((-455.130446271, -77.765392477), (-441.88722837, -73.326674178), (-428.412276206, -69.65098313))
            ThreePointArc((-428.412276206, -69.65098313), (-425.977962572, -66.146304208), (-429.169209779, -63.313531984))
            Line((-429.169209779, -63.313531984), (-456.269428929, -63.313531984))
            ThreePointArc((-456.269428929, -63.313531984), (-458.514492959, -64.243467954), (-459.444428928, -66.488531984))
            Line((-459.444428928, -66.488531984), (-459.444428928, -74.753979193))
            ThreePointArc((-459.444428928, -74.753979193), (-458.072640456, -77.384523639), (-455.130446271, -77.765392477))
        make_face()
    extrude(amount=CUT_EXTRUDE15_DEPTH, mode=Mode.SUBTRACT)


solid = part.part
